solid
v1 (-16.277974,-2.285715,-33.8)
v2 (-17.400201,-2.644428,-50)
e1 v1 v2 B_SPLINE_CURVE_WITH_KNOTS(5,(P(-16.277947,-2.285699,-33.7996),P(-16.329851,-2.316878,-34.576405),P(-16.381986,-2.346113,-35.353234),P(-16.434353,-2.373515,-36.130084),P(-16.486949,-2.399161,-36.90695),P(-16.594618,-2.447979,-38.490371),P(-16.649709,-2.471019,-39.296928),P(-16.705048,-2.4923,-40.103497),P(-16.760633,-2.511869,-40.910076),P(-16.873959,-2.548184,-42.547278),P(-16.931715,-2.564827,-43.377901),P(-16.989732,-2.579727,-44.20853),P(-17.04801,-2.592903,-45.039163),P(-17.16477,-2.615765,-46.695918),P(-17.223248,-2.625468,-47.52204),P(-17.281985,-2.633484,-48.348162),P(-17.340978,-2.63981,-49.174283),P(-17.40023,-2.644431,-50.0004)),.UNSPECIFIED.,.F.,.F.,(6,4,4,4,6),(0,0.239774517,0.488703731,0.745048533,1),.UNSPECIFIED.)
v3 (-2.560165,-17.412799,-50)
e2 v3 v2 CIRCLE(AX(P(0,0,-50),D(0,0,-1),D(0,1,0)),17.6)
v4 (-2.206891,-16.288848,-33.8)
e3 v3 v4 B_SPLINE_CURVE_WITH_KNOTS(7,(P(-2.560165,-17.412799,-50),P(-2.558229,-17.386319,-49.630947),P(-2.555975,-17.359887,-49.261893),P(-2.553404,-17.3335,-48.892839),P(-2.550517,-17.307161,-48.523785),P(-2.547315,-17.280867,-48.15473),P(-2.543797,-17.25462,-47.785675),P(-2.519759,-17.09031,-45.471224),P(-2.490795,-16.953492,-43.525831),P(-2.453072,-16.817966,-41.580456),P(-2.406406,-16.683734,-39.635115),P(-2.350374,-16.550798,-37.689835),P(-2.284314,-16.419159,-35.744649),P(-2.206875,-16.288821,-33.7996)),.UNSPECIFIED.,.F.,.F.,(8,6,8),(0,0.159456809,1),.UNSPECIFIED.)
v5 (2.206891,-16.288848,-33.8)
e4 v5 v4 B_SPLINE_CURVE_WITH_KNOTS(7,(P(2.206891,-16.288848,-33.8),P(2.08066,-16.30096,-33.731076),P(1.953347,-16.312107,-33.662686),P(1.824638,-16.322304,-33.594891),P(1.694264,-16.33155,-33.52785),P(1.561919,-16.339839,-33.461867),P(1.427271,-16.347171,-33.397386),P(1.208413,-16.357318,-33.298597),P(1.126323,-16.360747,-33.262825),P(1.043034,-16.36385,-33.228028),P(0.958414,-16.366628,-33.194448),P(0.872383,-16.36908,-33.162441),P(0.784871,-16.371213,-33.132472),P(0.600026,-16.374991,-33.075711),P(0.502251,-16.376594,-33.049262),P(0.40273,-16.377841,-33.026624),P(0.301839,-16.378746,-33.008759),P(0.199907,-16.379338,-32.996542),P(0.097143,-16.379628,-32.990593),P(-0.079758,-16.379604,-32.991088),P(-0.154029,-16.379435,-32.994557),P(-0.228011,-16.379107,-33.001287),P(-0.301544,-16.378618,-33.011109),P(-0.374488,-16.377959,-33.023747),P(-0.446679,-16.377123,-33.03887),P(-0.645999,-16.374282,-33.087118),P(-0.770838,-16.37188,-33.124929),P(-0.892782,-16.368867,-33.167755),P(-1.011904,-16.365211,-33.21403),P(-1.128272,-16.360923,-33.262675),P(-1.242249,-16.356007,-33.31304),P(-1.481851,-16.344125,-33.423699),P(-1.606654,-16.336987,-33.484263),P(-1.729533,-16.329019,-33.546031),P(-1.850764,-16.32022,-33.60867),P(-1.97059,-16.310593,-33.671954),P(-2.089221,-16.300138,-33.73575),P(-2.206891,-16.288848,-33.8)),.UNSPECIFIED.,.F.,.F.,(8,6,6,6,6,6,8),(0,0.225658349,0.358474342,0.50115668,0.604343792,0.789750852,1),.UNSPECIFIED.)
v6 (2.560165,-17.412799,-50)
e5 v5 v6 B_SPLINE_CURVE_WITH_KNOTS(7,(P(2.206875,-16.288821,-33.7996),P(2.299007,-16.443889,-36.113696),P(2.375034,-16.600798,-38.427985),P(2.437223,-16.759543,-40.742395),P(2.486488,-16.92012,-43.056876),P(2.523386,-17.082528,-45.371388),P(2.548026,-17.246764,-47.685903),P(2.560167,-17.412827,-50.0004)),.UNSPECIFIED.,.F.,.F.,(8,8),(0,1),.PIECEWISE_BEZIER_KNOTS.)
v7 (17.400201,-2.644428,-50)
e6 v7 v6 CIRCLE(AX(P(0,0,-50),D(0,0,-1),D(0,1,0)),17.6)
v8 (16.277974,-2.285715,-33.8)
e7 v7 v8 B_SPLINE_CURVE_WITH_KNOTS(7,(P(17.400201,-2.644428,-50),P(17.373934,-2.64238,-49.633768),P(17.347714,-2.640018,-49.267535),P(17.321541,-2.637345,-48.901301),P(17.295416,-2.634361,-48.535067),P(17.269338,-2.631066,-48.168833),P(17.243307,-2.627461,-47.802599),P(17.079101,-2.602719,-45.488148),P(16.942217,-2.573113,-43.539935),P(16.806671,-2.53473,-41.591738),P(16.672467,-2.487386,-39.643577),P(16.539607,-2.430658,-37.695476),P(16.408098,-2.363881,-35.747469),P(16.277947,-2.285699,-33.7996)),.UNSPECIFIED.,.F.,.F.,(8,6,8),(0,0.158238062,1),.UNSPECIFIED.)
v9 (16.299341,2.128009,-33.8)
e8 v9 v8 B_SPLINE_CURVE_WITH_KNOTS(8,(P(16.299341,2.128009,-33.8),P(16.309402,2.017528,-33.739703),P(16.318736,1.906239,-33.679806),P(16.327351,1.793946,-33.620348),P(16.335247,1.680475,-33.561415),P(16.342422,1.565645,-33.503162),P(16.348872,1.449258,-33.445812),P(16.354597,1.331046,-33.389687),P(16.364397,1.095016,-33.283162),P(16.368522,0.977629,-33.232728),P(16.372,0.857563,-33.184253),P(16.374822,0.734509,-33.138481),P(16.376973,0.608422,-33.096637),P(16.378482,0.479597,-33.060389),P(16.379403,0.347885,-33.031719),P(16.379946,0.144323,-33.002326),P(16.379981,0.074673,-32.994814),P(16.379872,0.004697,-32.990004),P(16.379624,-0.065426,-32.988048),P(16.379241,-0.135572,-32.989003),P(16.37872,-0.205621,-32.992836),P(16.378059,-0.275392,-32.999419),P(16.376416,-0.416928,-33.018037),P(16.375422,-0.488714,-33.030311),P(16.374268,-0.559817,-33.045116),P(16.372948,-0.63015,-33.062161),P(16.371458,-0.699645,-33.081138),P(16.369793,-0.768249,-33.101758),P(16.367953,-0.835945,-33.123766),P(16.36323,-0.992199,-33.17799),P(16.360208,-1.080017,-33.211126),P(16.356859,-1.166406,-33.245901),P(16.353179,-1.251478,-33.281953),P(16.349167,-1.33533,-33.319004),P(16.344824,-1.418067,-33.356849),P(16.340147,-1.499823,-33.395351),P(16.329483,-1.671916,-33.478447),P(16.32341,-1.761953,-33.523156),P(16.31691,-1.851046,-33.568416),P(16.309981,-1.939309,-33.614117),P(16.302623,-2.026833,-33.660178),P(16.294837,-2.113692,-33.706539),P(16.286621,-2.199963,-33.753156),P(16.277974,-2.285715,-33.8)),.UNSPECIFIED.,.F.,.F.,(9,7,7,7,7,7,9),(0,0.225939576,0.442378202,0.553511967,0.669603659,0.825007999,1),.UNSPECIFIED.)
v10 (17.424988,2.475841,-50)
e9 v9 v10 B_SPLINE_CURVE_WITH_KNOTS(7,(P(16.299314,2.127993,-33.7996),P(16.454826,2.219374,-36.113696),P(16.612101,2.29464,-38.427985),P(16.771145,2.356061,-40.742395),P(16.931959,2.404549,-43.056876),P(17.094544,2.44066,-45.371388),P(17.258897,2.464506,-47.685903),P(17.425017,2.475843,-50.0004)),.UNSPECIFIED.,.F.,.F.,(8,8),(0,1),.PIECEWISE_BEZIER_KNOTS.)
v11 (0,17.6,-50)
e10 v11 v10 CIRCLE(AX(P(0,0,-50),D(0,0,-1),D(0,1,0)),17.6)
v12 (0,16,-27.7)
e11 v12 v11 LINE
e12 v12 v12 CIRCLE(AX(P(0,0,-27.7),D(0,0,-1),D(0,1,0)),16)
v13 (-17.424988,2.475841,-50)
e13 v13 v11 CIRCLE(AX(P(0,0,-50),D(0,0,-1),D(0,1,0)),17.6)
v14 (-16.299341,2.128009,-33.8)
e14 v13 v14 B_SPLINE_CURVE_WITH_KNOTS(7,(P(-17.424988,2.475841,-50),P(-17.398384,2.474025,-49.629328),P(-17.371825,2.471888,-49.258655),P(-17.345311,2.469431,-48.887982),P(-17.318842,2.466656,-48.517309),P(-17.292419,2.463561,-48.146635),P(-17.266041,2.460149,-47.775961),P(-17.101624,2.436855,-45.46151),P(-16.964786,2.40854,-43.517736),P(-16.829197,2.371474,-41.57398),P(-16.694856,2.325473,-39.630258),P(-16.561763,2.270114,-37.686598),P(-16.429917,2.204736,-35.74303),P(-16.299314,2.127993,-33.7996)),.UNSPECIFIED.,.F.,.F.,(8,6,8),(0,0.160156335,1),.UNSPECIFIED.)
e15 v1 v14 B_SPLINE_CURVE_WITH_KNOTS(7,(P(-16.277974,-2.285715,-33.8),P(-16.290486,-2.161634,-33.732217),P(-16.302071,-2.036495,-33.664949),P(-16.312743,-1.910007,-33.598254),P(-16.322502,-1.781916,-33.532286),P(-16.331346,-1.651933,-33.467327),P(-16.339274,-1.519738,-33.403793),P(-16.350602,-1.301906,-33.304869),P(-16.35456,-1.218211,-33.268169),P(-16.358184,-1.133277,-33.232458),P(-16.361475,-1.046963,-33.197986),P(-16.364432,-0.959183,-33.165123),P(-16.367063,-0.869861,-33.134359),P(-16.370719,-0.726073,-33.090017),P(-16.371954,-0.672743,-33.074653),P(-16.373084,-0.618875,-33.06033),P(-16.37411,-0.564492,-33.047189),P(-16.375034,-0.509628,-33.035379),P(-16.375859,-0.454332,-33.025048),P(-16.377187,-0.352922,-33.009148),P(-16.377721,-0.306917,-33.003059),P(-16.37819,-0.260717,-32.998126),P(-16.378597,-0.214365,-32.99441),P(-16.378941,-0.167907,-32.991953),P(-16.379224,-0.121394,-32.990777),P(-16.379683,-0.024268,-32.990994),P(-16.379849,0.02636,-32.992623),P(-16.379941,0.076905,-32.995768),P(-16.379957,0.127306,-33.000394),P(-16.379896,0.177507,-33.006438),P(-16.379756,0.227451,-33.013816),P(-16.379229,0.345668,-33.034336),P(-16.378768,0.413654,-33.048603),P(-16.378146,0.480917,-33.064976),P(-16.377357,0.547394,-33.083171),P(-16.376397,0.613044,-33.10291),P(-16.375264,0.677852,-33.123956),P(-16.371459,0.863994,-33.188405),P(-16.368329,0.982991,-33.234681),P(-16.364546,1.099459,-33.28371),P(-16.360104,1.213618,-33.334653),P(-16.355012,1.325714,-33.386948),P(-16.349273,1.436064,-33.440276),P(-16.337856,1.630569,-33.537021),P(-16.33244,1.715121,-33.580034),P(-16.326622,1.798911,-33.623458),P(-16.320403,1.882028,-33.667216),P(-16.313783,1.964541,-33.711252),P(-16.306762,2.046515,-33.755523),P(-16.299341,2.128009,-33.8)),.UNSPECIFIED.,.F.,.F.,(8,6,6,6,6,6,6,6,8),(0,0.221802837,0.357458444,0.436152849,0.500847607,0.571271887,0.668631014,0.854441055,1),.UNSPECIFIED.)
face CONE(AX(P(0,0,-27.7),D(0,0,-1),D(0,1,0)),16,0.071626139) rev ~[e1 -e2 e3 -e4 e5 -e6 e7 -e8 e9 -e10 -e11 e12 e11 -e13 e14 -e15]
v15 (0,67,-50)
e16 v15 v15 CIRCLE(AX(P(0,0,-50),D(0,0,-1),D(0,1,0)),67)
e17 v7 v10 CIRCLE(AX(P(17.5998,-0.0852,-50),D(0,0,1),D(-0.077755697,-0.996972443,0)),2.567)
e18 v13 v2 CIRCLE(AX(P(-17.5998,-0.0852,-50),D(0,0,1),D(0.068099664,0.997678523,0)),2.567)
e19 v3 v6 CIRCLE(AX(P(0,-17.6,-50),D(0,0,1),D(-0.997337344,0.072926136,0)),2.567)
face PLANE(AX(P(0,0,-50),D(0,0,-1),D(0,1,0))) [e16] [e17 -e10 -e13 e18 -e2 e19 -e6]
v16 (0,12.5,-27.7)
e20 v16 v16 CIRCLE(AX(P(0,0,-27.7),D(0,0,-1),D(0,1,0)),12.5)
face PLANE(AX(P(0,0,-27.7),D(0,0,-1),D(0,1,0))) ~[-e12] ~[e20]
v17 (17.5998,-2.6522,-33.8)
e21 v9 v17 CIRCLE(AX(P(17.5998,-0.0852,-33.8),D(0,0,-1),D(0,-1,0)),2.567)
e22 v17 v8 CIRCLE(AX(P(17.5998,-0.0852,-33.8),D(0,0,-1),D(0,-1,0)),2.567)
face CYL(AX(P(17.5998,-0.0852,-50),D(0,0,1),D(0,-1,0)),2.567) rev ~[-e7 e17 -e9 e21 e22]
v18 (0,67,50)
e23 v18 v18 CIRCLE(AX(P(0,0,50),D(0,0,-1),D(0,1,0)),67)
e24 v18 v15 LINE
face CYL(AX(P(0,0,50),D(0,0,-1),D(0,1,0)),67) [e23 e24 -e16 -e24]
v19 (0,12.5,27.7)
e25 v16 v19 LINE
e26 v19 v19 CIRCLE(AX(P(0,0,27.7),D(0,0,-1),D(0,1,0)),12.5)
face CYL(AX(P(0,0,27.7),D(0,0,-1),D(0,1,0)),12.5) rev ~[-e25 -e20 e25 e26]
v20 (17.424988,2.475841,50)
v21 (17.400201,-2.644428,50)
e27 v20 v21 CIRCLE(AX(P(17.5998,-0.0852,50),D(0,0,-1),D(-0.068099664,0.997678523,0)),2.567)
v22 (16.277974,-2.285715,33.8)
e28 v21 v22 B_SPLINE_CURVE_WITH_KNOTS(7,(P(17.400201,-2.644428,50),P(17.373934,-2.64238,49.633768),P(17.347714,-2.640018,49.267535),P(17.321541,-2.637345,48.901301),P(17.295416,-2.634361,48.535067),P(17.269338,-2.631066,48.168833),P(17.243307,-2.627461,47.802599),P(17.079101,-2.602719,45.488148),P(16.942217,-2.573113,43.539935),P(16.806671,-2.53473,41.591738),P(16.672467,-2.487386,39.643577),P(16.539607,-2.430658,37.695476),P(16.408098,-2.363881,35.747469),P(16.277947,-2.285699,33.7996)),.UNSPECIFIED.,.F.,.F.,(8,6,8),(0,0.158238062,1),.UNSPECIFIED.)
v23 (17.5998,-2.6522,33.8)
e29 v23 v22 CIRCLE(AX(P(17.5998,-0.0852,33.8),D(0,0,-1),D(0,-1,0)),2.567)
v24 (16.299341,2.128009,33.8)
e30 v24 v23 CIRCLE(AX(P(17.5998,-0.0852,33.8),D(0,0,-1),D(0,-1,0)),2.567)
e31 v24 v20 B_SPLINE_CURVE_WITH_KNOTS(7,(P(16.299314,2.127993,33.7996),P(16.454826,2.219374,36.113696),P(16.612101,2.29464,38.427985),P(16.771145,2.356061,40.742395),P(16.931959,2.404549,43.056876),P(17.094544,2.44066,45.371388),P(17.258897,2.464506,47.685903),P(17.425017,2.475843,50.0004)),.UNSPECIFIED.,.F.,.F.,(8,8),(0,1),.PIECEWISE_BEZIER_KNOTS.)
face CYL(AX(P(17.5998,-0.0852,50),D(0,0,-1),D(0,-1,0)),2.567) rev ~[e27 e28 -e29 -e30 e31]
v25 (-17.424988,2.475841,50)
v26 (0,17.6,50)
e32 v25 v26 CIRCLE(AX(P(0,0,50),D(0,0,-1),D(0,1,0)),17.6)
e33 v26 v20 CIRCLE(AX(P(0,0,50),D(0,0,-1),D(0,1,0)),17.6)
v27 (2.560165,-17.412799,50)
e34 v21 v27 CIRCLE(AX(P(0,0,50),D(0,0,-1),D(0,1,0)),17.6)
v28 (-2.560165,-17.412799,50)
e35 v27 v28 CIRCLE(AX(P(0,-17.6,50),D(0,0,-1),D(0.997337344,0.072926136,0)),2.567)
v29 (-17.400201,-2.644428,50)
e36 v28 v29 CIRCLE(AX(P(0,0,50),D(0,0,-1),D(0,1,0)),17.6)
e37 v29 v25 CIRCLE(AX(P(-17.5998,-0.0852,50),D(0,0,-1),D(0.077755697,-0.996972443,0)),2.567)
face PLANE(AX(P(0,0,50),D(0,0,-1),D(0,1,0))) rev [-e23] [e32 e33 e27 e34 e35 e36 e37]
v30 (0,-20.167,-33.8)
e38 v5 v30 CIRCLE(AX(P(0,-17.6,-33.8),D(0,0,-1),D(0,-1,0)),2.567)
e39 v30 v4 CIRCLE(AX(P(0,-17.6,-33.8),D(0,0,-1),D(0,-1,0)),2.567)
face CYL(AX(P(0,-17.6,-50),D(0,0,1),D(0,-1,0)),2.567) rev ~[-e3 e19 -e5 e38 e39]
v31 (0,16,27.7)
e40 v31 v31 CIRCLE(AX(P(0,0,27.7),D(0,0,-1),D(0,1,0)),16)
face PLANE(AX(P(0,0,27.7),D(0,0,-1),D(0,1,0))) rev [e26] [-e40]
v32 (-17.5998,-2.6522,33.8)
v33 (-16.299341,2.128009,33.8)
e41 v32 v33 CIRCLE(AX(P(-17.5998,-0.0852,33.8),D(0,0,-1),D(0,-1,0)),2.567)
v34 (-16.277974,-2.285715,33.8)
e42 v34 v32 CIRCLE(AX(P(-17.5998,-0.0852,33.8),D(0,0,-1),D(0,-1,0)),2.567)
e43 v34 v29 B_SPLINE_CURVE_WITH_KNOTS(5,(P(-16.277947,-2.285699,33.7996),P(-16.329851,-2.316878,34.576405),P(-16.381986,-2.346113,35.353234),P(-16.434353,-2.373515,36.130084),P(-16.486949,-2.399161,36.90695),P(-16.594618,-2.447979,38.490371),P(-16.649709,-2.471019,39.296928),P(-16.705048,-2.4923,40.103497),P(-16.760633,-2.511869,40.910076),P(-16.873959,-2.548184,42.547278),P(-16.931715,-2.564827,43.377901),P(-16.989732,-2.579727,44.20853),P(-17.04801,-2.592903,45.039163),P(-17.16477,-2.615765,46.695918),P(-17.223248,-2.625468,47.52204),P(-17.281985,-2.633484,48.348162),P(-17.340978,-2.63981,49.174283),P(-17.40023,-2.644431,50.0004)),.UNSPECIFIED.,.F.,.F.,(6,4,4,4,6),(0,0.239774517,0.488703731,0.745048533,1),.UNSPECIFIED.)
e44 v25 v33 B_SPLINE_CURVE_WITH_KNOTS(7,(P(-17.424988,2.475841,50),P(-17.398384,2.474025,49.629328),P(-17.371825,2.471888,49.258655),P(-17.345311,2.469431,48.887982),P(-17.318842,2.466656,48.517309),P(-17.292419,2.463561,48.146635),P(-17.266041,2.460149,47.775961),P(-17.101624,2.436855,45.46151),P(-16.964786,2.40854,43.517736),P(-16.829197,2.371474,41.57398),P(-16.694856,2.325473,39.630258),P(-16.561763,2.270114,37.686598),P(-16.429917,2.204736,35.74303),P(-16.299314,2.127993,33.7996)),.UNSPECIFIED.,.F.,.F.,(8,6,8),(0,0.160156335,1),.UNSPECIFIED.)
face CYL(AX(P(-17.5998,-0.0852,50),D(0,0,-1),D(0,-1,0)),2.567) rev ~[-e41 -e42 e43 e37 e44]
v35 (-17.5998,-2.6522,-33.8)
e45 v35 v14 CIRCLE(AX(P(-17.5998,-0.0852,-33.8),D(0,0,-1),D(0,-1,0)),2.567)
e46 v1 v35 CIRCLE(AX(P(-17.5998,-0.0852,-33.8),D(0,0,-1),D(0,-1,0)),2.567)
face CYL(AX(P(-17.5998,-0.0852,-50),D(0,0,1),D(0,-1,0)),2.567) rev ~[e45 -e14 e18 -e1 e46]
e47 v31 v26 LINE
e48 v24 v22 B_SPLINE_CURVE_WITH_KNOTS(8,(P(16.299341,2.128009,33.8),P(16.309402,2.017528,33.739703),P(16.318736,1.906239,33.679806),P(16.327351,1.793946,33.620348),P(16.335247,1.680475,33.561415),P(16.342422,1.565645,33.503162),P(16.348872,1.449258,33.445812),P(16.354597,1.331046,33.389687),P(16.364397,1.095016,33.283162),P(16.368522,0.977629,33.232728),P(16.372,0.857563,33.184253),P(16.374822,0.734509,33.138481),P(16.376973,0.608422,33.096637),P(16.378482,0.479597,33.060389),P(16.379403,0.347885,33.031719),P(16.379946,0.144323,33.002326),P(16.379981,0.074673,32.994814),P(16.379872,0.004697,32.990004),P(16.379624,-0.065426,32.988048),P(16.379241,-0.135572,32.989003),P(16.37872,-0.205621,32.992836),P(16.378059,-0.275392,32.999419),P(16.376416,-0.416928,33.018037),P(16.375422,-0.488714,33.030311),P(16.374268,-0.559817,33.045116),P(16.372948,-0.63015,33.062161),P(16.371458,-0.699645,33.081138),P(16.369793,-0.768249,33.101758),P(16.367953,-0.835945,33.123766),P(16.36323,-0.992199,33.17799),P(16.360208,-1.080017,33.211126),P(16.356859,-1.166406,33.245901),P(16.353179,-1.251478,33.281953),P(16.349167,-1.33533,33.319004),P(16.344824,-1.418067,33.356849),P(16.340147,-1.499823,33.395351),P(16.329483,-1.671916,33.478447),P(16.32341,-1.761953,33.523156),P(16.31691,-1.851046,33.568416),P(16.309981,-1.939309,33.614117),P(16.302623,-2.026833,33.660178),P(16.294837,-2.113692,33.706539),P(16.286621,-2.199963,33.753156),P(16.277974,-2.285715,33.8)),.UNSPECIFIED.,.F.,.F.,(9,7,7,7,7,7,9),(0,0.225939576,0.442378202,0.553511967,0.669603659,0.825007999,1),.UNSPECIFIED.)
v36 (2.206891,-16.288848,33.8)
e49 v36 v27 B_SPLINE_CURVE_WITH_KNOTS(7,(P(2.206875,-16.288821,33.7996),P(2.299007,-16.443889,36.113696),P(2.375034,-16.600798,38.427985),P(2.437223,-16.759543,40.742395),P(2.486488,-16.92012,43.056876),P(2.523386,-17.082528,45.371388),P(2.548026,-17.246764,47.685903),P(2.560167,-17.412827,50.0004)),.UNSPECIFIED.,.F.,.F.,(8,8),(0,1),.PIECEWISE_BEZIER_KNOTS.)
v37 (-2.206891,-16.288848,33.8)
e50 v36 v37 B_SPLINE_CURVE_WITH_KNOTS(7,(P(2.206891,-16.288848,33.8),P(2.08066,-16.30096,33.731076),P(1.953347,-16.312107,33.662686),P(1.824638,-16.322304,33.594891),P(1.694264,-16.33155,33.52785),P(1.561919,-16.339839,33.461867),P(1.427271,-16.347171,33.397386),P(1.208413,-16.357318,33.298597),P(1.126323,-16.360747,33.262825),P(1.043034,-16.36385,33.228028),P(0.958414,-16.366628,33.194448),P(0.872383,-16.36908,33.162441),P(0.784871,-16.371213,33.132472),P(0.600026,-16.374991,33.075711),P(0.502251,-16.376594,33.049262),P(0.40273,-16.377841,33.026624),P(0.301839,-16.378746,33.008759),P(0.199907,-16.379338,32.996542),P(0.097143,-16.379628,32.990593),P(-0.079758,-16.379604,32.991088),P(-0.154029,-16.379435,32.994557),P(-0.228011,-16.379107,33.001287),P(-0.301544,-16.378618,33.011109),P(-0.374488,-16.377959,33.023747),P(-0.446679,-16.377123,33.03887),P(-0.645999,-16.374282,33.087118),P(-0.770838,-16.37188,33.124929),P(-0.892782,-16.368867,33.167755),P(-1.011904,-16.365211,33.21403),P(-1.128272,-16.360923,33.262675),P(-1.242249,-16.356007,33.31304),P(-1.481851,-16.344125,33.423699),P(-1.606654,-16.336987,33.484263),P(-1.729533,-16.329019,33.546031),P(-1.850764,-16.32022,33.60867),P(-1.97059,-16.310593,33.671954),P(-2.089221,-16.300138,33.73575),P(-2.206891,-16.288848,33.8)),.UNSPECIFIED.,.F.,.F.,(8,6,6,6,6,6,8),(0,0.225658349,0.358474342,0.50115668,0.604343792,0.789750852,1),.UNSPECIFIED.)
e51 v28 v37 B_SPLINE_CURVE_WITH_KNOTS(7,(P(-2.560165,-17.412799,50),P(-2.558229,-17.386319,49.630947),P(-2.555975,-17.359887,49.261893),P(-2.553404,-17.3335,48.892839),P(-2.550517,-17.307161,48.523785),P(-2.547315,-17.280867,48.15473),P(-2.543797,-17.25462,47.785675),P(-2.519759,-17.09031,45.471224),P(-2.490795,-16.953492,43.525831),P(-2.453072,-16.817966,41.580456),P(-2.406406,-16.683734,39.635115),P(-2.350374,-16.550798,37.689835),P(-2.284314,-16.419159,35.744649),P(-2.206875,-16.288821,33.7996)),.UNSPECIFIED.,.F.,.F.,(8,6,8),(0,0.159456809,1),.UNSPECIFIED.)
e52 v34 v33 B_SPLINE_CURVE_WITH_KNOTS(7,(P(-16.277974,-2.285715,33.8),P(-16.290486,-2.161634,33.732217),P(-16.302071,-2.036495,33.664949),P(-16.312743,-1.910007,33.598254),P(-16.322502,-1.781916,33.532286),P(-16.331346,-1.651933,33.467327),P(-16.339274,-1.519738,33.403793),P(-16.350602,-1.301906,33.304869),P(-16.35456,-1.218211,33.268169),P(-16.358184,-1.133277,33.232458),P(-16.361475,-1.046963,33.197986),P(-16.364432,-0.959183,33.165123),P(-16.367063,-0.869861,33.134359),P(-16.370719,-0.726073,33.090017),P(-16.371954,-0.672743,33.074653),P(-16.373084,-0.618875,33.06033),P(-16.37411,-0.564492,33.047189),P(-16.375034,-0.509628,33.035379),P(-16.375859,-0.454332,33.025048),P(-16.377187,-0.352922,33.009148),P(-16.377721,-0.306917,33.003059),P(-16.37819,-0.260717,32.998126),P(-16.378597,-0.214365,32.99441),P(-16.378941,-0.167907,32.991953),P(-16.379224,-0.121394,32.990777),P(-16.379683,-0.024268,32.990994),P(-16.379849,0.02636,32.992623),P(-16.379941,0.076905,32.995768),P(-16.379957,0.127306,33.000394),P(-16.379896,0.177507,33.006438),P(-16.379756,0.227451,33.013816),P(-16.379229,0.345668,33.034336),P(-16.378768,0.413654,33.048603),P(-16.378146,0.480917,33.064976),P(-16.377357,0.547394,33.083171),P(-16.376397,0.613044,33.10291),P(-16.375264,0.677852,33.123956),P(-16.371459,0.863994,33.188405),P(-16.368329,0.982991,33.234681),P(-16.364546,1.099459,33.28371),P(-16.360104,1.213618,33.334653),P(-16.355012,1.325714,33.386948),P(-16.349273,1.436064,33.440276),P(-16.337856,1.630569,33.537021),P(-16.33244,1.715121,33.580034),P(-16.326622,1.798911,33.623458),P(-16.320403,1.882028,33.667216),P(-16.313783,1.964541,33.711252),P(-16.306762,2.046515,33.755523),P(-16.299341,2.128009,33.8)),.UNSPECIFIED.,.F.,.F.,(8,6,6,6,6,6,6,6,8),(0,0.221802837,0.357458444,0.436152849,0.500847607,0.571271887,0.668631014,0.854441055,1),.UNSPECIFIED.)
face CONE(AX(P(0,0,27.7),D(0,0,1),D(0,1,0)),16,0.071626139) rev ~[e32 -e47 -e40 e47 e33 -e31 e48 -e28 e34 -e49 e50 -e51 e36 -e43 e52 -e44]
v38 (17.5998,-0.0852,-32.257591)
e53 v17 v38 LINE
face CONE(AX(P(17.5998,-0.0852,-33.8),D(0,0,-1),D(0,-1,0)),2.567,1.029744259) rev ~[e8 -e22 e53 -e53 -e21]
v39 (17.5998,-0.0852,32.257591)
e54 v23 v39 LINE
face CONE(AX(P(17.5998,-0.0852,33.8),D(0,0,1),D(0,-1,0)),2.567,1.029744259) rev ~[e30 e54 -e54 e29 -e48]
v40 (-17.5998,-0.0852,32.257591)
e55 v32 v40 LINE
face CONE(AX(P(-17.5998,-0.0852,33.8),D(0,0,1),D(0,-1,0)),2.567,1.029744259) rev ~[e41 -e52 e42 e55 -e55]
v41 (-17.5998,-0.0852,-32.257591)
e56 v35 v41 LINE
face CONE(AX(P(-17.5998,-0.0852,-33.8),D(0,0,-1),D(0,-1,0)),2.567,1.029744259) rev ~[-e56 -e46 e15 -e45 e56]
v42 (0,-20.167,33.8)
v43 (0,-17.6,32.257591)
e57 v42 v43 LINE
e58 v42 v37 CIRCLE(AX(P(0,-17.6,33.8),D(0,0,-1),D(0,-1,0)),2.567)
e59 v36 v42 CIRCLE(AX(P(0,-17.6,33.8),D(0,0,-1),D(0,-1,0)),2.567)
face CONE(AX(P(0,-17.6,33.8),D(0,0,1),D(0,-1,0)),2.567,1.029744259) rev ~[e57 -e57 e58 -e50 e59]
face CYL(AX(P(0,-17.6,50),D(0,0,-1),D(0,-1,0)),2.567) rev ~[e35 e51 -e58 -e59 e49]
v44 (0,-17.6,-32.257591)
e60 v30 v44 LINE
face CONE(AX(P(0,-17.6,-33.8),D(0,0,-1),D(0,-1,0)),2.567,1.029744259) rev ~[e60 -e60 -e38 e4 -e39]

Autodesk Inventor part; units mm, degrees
ref_plane "YZ Plane" through (0, 0, 0) normal (1, 0, 0) x (0, 1, 0)
ref_plane "XZ Plane" through (0, 0, 0) normal (0, 1, 0) x (-1, 0, 0)
ref_plane "XY Plane" through (0, 0, 0) normal (0, 0, 1) x (1, 0, 0)
sketch "Esquisse3" plane through (0, 0, 0) normal (1, 0, 0) x (0, 1, 0)
  line L0 (12.5, 50) -> (17.6, 50)
  line L1 (12.5, 27.7) -> (16, 27.7)
  line L2 (16, 27.7) -> (17.6, 50)
  line L3 (-39.3437, 0) -> (46.6159, 0)
  line L4 (12.5, -50) -> (17.6, -50)
  line L5 (12.5, -27.7) -> (16, -27.7)
  line L6 (16, -27.7) -> (17.6, -50)
  line L7 (12.5, -50) -> (12.5, -27.7)
  line L8 (0, 98.6871) -> (0, -122.4022)
  line L9 (17.6, 50) -> (67, 50)
  line L10 (67, 50) -> (67, -50)
  line L11 (67, -50) -> (17.6, -50)
  line L12 (12.5, 50) -> (12.5, 27.7)
  line L13 (12.5, 27.7) -> (12.5, -27.7)
  point P0 (0, 0)
  point P1 (40.7356, 59.8426)
  point P2 (56.7464, 59.8426)
  point P3 (58.3249, 81.8426)
  point P4 (40.7356, 81.8426)
  dimension "d14" = 22.3
  dimension "d19" = 0
  dimension "d20" = 100
  dimension "d21" = 0
  dimension "d22" = 25
  dimension "d23" = 134
  dimension "d25" = 35.2
  dimension "d26" = 32
revolve "Révolution1" add sketch "Esquisse3" angle 360 about axis through (0, 0, 98.6871) along (0, 0, -1) contours L9 L10 L11 L6 L5 L13 L1 L2
sketch "Esquisse4" plane through (0, 0, 50) normal (0, 0, 1) x (1, 0, 0)
  circle A0 centre (0, 0) radius 17.6 projected
  line L0 (-27.4685, -0.0852) -> (22.7682, -0.0852)
  line L1 (0, 22.4796) -> (0, -21.2618)
  point P0 (0, 0)
  point P1 (17.5998, -0.0852)
  point P2 (0, -17.6)
  point P3 (-17.5998, -0.0852)
hole "Perçage2" at (17.5998, -0.0852, 50) at (0, -17.6, 50) at (-17.5998, -0.0852, 50) direction (0, 0, -1) diameter 5.134 depth 16.2 tip angle 118 thread size "M6x0.8" class "6H" standard "ISO Metric profile"
mirror "Mise en miroir1" about plane through (0, 0, 0) normal (0, 0, 1) of "Perçage2"
properties part number "Masse"
